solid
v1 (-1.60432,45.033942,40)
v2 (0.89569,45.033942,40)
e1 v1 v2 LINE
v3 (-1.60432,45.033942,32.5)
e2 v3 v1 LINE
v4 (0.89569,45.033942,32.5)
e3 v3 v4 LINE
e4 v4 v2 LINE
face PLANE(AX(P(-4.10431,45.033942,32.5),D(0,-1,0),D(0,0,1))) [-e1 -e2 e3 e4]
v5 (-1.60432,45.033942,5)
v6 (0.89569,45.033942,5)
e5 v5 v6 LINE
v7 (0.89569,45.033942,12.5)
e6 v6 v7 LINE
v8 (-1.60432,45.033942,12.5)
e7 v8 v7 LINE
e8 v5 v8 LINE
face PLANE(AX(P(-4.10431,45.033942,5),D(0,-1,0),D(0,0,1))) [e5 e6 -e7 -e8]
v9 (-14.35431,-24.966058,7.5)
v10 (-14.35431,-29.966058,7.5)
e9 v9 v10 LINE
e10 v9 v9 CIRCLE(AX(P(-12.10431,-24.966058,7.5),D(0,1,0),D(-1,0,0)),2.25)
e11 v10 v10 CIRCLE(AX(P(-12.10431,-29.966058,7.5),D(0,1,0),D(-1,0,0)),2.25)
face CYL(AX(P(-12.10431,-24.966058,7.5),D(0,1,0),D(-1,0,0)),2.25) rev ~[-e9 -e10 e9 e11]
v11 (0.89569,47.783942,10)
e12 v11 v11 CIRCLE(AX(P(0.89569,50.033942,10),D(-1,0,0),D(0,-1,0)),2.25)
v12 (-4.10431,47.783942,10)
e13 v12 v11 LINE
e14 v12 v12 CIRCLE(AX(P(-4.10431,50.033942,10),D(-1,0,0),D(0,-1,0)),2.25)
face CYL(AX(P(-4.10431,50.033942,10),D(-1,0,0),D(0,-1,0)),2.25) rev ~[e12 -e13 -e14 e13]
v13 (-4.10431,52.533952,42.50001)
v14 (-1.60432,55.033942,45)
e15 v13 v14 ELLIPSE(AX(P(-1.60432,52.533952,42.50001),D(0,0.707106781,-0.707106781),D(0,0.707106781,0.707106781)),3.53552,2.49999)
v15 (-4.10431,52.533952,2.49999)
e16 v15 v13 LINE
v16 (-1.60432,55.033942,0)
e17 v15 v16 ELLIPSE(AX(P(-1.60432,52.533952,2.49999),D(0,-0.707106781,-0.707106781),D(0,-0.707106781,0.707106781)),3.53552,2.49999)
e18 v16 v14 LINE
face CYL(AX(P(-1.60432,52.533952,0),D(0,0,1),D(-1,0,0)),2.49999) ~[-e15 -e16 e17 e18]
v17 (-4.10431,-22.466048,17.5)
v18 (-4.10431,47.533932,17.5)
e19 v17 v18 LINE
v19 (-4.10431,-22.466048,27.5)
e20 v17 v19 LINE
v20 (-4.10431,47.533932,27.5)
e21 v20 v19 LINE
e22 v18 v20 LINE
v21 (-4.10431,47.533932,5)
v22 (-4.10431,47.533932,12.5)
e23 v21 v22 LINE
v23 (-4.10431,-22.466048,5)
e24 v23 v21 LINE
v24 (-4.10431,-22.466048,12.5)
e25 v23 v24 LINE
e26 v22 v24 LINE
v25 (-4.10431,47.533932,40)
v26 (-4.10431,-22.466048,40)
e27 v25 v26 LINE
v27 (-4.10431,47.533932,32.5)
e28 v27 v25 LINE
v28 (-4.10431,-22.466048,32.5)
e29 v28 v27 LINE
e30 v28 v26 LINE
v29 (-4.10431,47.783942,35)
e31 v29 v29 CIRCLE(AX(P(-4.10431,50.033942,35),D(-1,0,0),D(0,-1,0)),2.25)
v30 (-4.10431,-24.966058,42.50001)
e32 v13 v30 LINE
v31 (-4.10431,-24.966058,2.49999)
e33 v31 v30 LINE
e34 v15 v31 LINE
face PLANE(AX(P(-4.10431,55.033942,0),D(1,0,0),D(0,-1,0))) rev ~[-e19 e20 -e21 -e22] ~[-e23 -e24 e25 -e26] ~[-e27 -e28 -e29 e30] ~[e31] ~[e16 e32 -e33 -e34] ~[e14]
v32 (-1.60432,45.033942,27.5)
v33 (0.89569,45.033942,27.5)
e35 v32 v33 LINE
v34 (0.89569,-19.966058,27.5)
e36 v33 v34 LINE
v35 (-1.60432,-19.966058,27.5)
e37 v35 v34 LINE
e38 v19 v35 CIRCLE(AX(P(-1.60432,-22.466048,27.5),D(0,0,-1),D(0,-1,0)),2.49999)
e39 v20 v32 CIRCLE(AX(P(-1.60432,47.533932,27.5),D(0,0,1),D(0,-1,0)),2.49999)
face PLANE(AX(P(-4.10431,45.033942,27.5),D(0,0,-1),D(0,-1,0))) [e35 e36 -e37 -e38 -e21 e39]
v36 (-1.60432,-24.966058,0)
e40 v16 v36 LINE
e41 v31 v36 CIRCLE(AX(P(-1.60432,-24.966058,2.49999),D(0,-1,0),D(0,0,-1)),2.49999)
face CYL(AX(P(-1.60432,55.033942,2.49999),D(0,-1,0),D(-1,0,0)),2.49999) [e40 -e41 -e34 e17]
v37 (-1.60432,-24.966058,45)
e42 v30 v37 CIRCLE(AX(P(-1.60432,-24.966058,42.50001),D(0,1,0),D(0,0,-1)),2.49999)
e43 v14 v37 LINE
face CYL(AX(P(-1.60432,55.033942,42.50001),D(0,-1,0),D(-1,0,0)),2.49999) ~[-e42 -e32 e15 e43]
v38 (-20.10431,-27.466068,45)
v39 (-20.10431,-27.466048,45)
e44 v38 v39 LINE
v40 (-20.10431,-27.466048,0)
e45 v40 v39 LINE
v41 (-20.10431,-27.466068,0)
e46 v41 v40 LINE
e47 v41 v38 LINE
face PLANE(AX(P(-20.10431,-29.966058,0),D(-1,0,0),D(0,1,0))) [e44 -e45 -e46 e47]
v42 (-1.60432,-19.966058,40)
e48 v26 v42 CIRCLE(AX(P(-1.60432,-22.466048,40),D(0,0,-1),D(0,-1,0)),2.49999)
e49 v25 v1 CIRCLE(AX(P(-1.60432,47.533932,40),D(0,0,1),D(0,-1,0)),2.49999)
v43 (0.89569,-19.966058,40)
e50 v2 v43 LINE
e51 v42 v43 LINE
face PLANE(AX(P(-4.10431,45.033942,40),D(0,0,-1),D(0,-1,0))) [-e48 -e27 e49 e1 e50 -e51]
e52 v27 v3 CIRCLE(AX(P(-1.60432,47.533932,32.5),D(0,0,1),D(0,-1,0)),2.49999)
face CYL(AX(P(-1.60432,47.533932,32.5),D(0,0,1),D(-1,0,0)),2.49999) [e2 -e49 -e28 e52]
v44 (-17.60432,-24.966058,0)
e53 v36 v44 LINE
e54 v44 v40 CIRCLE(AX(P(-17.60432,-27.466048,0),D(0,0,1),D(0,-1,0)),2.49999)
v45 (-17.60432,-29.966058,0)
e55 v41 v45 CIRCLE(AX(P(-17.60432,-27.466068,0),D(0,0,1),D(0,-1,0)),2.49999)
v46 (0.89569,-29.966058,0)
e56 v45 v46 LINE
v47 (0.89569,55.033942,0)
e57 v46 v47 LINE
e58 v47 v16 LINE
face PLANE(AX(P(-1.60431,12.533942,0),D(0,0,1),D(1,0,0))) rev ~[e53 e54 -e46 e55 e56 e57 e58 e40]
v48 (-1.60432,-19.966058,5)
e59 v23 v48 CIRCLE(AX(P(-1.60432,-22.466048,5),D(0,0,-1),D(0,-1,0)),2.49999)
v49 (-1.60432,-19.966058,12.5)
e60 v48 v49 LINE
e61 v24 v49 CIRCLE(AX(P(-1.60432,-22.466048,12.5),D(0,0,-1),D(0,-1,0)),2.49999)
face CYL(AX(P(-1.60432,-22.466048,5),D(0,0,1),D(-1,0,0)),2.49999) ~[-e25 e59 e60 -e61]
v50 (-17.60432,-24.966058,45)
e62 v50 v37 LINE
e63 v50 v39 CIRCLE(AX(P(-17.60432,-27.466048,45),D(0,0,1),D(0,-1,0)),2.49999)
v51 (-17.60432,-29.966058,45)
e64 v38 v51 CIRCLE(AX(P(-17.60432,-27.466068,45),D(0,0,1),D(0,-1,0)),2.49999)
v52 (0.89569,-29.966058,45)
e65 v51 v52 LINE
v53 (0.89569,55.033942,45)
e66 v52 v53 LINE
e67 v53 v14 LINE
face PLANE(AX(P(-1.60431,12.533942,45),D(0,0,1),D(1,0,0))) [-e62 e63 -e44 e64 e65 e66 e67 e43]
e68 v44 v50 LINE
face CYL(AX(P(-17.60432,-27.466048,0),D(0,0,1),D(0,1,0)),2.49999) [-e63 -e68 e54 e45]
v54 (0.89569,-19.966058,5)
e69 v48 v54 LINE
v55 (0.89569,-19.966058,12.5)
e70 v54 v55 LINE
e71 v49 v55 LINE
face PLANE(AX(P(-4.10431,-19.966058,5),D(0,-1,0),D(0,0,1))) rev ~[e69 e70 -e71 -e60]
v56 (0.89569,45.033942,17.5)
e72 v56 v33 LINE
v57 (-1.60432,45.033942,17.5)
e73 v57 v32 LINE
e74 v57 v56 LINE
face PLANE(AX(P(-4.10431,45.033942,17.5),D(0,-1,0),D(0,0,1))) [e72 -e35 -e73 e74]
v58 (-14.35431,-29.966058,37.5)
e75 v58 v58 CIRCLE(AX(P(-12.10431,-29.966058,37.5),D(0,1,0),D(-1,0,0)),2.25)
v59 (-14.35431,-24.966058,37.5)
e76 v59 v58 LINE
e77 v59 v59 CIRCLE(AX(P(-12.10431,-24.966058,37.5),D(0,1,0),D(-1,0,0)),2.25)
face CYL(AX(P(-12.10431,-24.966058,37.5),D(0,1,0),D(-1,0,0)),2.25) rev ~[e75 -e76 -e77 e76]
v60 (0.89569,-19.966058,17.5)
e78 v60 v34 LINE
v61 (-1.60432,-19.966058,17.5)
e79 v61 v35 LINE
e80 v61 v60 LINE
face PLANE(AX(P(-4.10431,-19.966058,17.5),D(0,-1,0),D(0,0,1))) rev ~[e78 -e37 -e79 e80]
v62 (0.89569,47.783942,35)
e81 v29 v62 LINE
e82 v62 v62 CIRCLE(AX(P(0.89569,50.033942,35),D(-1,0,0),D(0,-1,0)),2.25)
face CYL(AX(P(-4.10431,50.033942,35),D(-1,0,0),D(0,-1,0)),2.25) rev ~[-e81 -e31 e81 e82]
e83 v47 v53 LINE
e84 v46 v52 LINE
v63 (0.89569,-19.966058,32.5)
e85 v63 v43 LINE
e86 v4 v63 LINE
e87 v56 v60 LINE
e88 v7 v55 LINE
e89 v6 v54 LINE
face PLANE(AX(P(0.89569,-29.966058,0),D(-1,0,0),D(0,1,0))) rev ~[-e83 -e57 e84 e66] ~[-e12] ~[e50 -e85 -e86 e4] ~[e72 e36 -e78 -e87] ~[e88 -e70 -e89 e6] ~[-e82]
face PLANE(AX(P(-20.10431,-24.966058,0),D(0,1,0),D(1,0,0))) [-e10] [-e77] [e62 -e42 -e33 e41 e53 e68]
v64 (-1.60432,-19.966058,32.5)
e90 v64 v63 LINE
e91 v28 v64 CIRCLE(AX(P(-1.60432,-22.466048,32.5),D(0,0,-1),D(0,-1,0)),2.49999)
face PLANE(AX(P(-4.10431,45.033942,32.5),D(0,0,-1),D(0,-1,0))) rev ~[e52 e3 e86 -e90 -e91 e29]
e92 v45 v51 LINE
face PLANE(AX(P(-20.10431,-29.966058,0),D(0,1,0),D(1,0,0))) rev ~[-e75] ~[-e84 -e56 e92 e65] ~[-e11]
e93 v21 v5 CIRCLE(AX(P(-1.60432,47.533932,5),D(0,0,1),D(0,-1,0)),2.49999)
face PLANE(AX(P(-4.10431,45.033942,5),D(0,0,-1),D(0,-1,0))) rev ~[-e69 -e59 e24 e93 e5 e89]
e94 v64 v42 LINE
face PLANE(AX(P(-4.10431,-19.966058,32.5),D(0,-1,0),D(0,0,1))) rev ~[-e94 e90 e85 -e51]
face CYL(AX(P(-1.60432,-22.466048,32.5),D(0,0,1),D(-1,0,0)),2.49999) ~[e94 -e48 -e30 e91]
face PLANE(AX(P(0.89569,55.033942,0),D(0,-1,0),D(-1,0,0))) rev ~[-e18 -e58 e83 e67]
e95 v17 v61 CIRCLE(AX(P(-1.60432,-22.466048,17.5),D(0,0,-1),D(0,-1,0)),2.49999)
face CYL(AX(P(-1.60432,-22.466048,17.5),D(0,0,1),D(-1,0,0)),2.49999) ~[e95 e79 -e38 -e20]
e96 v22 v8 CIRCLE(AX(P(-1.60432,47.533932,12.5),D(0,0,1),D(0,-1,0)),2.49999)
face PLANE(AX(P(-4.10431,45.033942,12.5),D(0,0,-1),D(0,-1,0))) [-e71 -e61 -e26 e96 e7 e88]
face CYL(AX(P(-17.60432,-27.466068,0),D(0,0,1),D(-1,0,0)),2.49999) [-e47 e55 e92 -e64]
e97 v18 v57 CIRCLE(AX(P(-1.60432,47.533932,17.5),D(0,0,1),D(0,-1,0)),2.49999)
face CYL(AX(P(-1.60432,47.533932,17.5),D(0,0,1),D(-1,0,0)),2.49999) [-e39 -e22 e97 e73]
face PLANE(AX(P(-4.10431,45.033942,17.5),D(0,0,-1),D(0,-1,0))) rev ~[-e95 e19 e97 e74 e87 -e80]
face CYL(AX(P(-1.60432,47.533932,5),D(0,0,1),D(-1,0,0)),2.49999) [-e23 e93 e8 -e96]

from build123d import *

# Parameters (mm, degrees)
F0_W     = 16
F0_H     = 5
F1_DEPTH = 45
F2_R     = 2.25
F3_DEPTH = 5
F4_W     = 65
F4_H     = 7.5
F4_R     = 2.25
F4_H_2   = 10
F5_DEPTH = 5
F6_R     = 2.49999


# Not quite as in the source:
# - a fillet or chamfer is up to 0.001 mm smaller than in the source, because OpenCascade refuses the exact size
# - a feature names something its author has since deleted; it is built from what else it names


with BuildPart() as f1:
    # F0 (on Top) → F1 (new body)
    with BuildSketch(Plane.XY):
        Polygon((-4.1043104958, 55.0339419188), (-4.1043104958, -24.9660580812), (-4.1043104958, -29.9660580812), (0.8956895042, -29.9660580812), (0.8956895042, 55.0339419188), align=None)
        with Locations((-12.1043104958, -27.4660580812)):
            Rectangle(F0_W, F0_H)
    extrude(amount=F1_DEPTH)

    # F2 (on face) → F3 (cut, through all)
    with BuildSketch(Plane(origin=(0, -24.9660580812, 0), x_dir=(-1, 0, 0), z_dir=(0, 1, 0))):
        with Locations((12.1043104958, 7.5)):
            Circle(F2_R)
        with Locations((12.1043104958, 37.5)):
            Circle(F2_R)
    extrude(amount=-F3_DEPTH, mode=Mode.SUBTRACT)

    # F4 (on face) → F5 (cut, through all)
    with BuildSketch(Plane(origin=(-4.1043104958, 0, 0), x_dir=(0, -1, 0), z_dir=(-1, 0, 0))):
        with Locations((-12.5339419188, 8.75)):
            Rectangle(F4_W, F4_H)
        with Locations((-50.0339419188, 35)):
            Circle(F4_R)
        with Locations((-50.0339419188, 10)):
            Circle(F4_R)
        with Locations((-12.5339419188, 22.5)):
            Rectangle(F4_W, F4_H_2)
        with Locations((-12.5339419188, 36.25)):
            Rectangle(F4_W, F4_H)
    extrude(amount=-F5_DEPTH, mode=Mode.SUBTRACT)

    # F6 (radius 2.5 in the source; OpenCascade refuses exactly that, so slightly less here)
    f6_edges = [f1.edges().sort_by_distance(p)[0] for p in [
        (-4.10431, 15.033942, 0),
        (-4.10431, 55.033942, 22.5),
        (-4.10431, 15.033942, 45),
        (-4.10431, 45.033942, 8.75),
        (-4.10431, 45.033942, 22.5),
        (-4.10431, 45.033942, 36.25),
        (-4.10431, -19.966058, 8.75),
        (-4.10431, -19.966058, 22.5),
        (-4.10431, -19.966058, 36.25),
        (-20.10431, -24.966058, 22.5),
        (-20.10431, -29.966058, 22.5),
    ]]
    fillet(f6_edges, radius=F6_R)


solid = f1.part
